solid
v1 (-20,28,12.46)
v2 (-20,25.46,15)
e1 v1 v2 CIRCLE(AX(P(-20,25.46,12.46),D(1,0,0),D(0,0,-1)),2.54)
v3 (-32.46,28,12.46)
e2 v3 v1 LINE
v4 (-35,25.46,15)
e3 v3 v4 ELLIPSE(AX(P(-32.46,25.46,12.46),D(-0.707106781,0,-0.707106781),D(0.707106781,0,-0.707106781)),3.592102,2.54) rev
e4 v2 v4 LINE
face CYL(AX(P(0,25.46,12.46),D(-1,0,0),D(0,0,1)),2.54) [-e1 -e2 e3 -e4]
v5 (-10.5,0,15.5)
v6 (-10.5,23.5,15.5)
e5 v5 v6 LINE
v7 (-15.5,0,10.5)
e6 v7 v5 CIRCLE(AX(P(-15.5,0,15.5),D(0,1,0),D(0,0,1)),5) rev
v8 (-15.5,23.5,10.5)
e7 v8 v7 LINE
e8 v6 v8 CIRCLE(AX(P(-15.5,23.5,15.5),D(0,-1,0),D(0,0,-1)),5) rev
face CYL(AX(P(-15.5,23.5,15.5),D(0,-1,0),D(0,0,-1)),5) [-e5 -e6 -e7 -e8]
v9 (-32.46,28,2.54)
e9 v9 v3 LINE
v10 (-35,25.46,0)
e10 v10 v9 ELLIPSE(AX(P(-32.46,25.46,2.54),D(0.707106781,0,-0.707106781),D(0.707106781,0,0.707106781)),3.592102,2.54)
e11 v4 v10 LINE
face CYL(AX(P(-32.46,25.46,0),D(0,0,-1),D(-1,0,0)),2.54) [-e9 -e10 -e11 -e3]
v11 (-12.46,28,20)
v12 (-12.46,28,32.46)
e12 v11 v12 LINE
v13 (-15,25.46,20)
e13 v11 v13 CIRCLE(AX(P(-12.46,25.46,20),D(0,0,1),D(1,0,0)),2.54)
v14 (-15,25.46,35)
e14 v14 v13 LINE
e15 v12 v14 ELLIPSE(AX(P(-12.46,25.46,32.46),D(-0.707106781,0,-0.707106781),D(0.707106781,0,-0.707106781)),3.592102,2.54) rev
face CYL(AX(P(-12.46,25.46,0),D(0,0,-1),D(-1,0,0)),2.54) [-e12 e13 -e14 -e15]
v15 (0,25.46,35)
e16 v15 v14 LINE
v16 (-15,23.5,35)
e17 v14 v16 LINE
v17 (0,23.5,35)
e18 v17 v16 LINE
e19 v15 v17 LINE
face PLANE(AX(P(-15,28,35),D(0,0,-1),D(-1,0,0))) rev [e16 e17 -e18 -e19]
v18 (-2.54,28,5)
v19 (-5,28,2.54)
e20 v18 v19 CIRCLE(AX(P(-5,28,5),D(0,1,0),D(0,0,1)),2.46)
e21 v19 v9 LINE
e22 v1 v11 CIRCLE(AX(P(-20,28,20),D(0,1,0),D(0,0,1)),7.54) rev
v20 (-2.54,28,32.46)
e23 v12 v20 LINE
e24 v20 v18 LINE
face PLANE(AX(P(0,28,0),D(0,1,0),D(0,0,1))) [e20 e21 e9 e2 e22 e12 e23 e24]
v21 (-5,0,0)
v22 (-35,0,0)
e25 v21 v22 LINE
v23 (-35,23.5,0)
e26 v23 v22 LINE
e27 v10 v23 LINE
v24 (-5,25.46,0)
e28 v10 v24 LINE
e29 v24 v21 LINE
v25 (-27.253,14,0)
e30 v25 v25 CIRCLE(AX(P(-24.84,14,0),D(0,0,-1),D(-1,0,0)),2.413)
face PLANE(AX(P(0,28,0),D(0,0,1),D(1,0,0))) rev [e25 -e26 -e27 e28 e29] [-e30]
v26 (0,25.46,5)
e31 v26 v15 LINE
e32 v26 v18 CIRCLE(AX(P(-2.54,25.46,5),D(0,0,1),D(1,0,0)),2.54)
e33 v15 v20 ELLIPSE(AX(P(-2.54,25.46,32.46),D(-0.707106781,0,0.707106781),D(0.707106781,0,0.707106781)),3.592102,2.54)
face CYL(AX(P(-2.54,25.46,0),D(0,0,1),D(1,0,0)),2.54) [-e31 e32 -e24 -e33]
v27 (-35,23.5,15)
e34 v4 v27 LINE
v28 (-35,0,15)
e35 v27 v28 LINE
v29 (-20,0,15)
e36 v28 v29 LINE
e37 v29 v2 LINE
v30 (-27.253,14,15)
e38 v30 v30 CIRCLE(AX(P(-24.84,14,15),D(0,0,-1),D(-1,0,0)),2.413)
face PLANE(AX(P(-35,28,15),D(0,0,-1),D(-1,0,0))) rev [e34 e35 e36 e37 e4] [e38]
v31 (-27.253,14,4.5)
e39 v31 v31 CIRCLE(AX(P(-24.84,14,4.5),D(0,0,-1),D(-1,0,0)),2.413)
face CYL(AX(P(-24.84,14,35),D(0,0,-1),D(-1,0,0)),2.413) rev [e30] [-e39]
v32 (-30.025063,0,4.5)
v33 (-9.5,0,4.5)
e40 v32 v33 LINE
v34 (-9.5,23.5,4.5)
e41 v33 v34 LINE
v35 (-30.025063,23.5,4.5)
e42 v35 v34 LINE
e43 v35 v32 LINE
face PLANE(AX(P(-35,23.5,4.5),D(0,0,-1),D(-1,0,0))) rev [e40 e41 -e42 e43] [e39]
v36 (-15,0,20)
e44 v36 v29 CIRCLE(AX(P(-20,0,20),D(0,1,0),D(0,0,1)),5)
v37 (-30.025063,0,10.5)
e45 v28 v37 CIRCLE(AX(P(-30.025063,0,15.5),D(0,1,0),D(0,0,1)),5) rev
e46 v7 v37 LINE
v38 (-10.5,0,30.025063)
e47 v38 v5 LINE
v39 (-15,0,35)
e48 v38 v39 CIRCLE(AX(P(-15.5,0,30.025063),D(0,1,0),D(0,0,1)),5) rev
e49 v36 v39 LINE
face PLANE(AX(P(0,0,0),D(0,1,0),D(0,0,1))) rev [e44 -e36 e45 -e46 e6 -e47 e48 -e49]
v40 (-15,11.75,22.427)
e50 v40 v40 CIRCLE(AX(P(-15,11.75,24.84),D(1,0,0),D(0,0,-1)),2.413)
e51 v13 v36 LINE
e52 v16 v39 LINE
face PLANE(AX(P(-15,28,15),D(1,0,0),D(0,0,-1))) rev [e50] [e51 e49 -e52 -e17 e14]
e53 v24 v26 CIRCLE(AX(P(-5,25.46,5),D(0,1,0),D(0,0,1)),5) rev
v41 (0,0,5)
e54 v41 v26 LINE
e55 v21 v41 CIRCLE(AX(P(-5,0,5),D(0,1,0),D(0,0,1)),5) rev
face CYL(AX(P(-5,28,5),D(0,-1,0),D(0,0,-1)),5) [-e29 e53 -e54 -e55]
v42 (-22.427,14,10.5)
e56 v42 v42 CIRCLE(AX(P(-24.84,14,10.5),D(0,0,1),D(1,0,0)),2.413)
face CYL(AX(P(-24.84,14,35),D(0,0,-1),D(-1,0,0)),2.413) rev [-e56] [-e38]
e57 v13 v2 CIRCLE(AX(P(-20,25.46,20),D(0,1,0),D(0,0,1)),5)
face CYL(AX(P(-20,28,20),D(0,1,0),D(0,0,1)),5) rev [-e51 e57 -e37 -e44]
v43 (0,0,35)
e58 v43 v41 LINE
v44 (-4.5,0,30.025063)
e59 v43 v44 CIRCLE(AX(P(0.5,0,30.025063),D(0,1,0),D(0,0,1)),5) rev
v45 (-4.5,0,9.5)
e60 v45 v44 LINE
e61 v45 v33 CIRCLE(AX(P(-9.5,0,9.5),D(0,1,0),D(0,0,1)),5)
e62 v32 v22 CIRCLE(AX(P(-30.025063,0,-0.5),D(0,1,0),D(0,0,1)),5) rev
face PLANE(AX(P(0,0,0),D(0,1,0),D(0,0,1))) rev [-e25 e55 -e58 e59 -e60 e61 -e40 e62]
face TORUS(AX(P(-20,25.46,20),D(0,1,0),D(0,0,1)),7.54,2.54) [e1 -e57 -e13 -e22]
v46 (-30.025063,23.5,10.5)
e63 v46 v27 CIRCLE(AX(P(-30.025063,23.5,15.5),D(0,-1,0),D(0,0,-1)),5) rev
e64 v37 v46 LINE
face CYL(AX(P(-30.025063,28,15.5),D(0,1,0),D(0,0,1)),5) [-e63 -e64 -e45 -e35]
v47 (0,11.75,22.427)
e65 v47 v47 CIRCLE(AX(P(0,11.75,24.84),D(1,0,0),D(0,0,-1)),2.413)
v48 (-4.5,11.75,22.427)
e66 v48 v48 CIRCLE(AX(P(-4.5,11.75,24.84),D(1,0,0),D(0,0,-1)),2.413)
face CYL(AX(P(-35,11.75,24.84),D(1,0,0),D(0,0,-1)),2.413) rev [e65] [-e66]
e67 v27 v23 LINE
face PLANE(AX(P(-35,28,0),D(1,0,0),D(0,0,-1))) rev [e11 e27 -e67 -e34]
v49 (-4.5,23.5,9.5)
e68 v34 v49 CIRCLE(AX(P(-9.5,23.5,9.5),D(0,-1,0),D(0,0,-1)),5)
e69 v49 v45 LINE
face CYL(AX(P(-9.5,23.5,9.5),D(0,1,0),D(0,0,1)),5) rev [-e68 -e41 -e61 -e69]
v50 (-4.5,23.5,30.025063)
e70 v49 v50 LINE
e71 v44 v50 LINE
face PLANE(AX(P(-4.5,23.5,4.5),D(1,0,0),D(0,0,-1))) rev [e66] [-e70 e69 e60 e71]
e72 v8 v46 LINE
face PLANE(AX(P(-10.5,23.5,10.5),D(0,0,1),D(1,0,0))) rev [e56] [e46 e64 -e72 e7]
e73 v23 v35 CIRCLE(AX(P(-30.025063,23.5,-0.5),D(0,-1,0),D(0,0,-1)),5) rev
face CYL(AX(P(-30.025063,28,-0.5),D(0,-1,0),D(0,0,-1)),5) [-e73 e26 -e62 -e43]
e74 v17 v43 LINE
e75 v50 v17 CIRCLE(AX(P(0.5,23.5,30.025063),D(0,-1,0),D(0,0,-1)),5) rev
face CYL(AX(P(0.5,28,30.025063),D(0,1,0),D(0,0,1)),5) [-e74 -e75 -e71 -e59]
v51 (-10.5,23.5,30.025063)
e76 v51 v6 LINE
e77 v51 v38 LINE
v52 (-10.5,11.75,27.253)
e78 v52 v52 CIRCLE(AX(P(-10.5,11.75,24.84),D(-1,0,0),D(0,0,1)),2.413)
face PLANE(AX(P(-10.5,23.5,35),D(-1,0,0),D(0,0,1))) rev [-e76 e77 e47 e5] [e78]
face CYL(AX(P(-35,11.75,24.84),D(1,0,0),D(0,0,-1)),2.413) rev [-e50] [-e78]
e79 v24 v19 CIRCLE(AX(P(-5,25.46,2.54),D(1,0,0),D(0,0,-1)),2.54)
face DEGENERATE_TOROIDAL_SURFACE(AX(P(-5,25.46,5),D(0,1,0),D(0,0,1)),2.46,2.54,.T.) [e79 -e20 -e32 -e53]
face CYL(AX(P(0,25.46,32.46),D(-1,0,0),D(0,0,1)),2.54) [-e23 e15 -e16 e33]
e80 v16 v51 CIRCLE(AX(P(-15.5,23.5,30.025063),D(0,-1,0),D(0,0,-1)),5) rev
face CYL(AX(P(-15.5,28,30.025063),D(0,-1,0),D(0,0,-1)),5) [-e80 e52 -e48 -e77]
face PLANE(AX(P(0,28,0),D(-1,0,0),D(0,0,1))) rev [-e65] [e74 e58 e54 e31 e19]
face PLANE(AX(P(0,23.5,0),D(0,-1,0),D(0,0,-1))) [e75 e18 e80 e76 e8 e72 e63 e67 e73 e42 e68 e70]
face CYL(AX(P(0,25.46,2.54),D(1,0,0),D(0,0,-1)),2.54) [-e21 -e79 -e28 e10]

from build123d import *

# Parameters (mm, degrees)
BOSS_EXTRUDE1_DEPTH = 28
CUT_EXTRUDE1_DEPTH  = 23.5
FILLET1_R           = 5
FILLET3_R           = 5
FILLET4_R           = 5
SKETCH3_R           = 2.413
CUT_EXTRUDE2_DEPTH  = 57.868268832
SKETCH4_R           = 2.413
CUT_EXTRUDE3_DEPTH  = 57.868268832
FILLET5_R           = 2.54


with BuildPart() as part:
    # Sketch1 → Boss-Extrude1 (new body)
    with BuildSketch(Plane(origin=(0, 0, 0), x_dir=(1, 0, 0), z_dir=(0, 1, 0))):
        Polygon((0, 0), (-35, 0), (-35, -15), (-15, -15), (-15, -35), (0, -35), align=None)
    extrude(amount=BOSS_EXTRUDE1_DEPTH)

    # Sketch2 → Cut-Extrude1 (cut)
    with BuildSketch(Plane.XZ):
        Polygon((-35, 4.5), (-4.5, 4.5), (-4.5, 35), (-10.5, 35), (-10.5, 10.5), (-35, 10.5), align=None)
    extrude(amount=-CUT_EXTRUDE1_DEPTH, mode=Mode.SUBTRACT)

    # Fillet1
    fillet1_edges = [part.edges().sort_by_distance(p)[0] for p in [
        (-10.5, 11.75, 10.5),
        (-4.5, 11.75, 4.5),
    ]]
    fillet(fillet1_edges, radius=FILLET1_R)

    # Fillet3
    # the kernel refuses this fillet: 5 mm, written as the material it takes off along each edge
    with BuildSketch(Plane(origin=(-4.5, -12.437342964, 35), x_dir=(0, 0, -1), z_dir=(0, 1, 0))) as fillet3_piece_1:
        with BuildLine():
            CenterArc((4.974937186, -5), FILLET3_R, 90, 84.260829523)
            Line((0, -4.5), (0, 0))
            Line((0, 0), (4.974937186, 0))
        make_face()
    extrude(amount=35.937342964, mode=Mode.SUBTRACT)
    with BuildSketch(Plane(origin=(-10.5, -12.437342964, 35), x_dir=(-1, 0, 0), z_dir=(0, 1, 0))) as fillet3_piece_2:
        with BuildLine():
            CenterArc((5, -4.974937186), FILLET3_R, 95.739170477, 84.260829523)
            Line((0, -4.974937186), (0, 0))
            Line((0, 0), (4.5, 0))
        make_face()
    extrude(amount=35.937342964, mode=Mode.SUBTRACT)
    with BuildSketch(Plane(origin=(-35, -12.437342964, 10.5), x_dir=(0, 0, 1), z_dir=(0, 1, 0))) as fillet3_piece_3:
        with BuildLine():
            CenterArc((5, 4.974937186), FILLET3_R, 180, 84.260829523)
            Line((0, 4.974937186), (0, 0))
            Line((0, 0), (4.5, 0))
        make_face()
    extrude(amount=35.937342964, mode=Mode.SUBTRACT)
    with BuildSketch(Plane(origin=(-35, -12.437342964, 4.5), x_dir=(1, 0, 0), z_dir=(0, 1, 0))) as fillet3_piece_4:
        with BuildLine():
            CenterArc((4.974937186, 5), FILLET3_R, 185.739170477, 84.260829523)
            Line((0, 4.5), (0, 0))
            Line((0, 0), (4.974937186, 0))
        make_face()
    extrude(amount=35.937342964, mode=Mode.SUBTRACT)

    # Fillet4
    fillet4_edges = [part.edges().sort_by_distance(p)[0] for p in [
        (-15, 14, 15),
        (0, 14, 0),
    ]]
    fillet(fillet4_edges, radius=FILLET4_R)

    # Sketch3 → Cut-Extrude2 (cut, through all)
    with BuildSketch(Plane(origin=(0, 0, 0), x_dir=(0, 0, -1), z_dir=(1, 0, 0))):
        with Locations((-24.84, 11.75)):
            Circle(SKETCH3_R)
    extrude(amount=-CUT_EXTRUDE2_DEPTH, mode=Mode.SUBTRACT)

    # Sketch4 → Cut-Extrude3 (cut, through all)
    with BuildSketch(Plane(origin=(0, 0, 0), x_dir=(-1, 0, 0), z_dir=(0, 0, -1))):
        with Locations((24.84, 14)):
            Circle(SKETCH4_R)
    extrude(amount=-CUT_EXTRUDE3_DEPTH, mode=Mode.SUBTRACT)

    # Fillet5
    fillet5_edges = [part.edges().sort_by_distance(p)[0] for p in [
        (-20, 28, 0),
        (-15, 28, 27.5),
        (-1.464466094, 28, 1.464466094),
        (-16.464466094, 28, 16.464466094),
        (-35, 28, 7.5),
        (-27.5, 28, 15),
        (-7.5, 28, 35),
        (0, 28, 20),
    ]]
    fillet(fillet5_edges, radius=FILLET5_R)


solid = part.part
